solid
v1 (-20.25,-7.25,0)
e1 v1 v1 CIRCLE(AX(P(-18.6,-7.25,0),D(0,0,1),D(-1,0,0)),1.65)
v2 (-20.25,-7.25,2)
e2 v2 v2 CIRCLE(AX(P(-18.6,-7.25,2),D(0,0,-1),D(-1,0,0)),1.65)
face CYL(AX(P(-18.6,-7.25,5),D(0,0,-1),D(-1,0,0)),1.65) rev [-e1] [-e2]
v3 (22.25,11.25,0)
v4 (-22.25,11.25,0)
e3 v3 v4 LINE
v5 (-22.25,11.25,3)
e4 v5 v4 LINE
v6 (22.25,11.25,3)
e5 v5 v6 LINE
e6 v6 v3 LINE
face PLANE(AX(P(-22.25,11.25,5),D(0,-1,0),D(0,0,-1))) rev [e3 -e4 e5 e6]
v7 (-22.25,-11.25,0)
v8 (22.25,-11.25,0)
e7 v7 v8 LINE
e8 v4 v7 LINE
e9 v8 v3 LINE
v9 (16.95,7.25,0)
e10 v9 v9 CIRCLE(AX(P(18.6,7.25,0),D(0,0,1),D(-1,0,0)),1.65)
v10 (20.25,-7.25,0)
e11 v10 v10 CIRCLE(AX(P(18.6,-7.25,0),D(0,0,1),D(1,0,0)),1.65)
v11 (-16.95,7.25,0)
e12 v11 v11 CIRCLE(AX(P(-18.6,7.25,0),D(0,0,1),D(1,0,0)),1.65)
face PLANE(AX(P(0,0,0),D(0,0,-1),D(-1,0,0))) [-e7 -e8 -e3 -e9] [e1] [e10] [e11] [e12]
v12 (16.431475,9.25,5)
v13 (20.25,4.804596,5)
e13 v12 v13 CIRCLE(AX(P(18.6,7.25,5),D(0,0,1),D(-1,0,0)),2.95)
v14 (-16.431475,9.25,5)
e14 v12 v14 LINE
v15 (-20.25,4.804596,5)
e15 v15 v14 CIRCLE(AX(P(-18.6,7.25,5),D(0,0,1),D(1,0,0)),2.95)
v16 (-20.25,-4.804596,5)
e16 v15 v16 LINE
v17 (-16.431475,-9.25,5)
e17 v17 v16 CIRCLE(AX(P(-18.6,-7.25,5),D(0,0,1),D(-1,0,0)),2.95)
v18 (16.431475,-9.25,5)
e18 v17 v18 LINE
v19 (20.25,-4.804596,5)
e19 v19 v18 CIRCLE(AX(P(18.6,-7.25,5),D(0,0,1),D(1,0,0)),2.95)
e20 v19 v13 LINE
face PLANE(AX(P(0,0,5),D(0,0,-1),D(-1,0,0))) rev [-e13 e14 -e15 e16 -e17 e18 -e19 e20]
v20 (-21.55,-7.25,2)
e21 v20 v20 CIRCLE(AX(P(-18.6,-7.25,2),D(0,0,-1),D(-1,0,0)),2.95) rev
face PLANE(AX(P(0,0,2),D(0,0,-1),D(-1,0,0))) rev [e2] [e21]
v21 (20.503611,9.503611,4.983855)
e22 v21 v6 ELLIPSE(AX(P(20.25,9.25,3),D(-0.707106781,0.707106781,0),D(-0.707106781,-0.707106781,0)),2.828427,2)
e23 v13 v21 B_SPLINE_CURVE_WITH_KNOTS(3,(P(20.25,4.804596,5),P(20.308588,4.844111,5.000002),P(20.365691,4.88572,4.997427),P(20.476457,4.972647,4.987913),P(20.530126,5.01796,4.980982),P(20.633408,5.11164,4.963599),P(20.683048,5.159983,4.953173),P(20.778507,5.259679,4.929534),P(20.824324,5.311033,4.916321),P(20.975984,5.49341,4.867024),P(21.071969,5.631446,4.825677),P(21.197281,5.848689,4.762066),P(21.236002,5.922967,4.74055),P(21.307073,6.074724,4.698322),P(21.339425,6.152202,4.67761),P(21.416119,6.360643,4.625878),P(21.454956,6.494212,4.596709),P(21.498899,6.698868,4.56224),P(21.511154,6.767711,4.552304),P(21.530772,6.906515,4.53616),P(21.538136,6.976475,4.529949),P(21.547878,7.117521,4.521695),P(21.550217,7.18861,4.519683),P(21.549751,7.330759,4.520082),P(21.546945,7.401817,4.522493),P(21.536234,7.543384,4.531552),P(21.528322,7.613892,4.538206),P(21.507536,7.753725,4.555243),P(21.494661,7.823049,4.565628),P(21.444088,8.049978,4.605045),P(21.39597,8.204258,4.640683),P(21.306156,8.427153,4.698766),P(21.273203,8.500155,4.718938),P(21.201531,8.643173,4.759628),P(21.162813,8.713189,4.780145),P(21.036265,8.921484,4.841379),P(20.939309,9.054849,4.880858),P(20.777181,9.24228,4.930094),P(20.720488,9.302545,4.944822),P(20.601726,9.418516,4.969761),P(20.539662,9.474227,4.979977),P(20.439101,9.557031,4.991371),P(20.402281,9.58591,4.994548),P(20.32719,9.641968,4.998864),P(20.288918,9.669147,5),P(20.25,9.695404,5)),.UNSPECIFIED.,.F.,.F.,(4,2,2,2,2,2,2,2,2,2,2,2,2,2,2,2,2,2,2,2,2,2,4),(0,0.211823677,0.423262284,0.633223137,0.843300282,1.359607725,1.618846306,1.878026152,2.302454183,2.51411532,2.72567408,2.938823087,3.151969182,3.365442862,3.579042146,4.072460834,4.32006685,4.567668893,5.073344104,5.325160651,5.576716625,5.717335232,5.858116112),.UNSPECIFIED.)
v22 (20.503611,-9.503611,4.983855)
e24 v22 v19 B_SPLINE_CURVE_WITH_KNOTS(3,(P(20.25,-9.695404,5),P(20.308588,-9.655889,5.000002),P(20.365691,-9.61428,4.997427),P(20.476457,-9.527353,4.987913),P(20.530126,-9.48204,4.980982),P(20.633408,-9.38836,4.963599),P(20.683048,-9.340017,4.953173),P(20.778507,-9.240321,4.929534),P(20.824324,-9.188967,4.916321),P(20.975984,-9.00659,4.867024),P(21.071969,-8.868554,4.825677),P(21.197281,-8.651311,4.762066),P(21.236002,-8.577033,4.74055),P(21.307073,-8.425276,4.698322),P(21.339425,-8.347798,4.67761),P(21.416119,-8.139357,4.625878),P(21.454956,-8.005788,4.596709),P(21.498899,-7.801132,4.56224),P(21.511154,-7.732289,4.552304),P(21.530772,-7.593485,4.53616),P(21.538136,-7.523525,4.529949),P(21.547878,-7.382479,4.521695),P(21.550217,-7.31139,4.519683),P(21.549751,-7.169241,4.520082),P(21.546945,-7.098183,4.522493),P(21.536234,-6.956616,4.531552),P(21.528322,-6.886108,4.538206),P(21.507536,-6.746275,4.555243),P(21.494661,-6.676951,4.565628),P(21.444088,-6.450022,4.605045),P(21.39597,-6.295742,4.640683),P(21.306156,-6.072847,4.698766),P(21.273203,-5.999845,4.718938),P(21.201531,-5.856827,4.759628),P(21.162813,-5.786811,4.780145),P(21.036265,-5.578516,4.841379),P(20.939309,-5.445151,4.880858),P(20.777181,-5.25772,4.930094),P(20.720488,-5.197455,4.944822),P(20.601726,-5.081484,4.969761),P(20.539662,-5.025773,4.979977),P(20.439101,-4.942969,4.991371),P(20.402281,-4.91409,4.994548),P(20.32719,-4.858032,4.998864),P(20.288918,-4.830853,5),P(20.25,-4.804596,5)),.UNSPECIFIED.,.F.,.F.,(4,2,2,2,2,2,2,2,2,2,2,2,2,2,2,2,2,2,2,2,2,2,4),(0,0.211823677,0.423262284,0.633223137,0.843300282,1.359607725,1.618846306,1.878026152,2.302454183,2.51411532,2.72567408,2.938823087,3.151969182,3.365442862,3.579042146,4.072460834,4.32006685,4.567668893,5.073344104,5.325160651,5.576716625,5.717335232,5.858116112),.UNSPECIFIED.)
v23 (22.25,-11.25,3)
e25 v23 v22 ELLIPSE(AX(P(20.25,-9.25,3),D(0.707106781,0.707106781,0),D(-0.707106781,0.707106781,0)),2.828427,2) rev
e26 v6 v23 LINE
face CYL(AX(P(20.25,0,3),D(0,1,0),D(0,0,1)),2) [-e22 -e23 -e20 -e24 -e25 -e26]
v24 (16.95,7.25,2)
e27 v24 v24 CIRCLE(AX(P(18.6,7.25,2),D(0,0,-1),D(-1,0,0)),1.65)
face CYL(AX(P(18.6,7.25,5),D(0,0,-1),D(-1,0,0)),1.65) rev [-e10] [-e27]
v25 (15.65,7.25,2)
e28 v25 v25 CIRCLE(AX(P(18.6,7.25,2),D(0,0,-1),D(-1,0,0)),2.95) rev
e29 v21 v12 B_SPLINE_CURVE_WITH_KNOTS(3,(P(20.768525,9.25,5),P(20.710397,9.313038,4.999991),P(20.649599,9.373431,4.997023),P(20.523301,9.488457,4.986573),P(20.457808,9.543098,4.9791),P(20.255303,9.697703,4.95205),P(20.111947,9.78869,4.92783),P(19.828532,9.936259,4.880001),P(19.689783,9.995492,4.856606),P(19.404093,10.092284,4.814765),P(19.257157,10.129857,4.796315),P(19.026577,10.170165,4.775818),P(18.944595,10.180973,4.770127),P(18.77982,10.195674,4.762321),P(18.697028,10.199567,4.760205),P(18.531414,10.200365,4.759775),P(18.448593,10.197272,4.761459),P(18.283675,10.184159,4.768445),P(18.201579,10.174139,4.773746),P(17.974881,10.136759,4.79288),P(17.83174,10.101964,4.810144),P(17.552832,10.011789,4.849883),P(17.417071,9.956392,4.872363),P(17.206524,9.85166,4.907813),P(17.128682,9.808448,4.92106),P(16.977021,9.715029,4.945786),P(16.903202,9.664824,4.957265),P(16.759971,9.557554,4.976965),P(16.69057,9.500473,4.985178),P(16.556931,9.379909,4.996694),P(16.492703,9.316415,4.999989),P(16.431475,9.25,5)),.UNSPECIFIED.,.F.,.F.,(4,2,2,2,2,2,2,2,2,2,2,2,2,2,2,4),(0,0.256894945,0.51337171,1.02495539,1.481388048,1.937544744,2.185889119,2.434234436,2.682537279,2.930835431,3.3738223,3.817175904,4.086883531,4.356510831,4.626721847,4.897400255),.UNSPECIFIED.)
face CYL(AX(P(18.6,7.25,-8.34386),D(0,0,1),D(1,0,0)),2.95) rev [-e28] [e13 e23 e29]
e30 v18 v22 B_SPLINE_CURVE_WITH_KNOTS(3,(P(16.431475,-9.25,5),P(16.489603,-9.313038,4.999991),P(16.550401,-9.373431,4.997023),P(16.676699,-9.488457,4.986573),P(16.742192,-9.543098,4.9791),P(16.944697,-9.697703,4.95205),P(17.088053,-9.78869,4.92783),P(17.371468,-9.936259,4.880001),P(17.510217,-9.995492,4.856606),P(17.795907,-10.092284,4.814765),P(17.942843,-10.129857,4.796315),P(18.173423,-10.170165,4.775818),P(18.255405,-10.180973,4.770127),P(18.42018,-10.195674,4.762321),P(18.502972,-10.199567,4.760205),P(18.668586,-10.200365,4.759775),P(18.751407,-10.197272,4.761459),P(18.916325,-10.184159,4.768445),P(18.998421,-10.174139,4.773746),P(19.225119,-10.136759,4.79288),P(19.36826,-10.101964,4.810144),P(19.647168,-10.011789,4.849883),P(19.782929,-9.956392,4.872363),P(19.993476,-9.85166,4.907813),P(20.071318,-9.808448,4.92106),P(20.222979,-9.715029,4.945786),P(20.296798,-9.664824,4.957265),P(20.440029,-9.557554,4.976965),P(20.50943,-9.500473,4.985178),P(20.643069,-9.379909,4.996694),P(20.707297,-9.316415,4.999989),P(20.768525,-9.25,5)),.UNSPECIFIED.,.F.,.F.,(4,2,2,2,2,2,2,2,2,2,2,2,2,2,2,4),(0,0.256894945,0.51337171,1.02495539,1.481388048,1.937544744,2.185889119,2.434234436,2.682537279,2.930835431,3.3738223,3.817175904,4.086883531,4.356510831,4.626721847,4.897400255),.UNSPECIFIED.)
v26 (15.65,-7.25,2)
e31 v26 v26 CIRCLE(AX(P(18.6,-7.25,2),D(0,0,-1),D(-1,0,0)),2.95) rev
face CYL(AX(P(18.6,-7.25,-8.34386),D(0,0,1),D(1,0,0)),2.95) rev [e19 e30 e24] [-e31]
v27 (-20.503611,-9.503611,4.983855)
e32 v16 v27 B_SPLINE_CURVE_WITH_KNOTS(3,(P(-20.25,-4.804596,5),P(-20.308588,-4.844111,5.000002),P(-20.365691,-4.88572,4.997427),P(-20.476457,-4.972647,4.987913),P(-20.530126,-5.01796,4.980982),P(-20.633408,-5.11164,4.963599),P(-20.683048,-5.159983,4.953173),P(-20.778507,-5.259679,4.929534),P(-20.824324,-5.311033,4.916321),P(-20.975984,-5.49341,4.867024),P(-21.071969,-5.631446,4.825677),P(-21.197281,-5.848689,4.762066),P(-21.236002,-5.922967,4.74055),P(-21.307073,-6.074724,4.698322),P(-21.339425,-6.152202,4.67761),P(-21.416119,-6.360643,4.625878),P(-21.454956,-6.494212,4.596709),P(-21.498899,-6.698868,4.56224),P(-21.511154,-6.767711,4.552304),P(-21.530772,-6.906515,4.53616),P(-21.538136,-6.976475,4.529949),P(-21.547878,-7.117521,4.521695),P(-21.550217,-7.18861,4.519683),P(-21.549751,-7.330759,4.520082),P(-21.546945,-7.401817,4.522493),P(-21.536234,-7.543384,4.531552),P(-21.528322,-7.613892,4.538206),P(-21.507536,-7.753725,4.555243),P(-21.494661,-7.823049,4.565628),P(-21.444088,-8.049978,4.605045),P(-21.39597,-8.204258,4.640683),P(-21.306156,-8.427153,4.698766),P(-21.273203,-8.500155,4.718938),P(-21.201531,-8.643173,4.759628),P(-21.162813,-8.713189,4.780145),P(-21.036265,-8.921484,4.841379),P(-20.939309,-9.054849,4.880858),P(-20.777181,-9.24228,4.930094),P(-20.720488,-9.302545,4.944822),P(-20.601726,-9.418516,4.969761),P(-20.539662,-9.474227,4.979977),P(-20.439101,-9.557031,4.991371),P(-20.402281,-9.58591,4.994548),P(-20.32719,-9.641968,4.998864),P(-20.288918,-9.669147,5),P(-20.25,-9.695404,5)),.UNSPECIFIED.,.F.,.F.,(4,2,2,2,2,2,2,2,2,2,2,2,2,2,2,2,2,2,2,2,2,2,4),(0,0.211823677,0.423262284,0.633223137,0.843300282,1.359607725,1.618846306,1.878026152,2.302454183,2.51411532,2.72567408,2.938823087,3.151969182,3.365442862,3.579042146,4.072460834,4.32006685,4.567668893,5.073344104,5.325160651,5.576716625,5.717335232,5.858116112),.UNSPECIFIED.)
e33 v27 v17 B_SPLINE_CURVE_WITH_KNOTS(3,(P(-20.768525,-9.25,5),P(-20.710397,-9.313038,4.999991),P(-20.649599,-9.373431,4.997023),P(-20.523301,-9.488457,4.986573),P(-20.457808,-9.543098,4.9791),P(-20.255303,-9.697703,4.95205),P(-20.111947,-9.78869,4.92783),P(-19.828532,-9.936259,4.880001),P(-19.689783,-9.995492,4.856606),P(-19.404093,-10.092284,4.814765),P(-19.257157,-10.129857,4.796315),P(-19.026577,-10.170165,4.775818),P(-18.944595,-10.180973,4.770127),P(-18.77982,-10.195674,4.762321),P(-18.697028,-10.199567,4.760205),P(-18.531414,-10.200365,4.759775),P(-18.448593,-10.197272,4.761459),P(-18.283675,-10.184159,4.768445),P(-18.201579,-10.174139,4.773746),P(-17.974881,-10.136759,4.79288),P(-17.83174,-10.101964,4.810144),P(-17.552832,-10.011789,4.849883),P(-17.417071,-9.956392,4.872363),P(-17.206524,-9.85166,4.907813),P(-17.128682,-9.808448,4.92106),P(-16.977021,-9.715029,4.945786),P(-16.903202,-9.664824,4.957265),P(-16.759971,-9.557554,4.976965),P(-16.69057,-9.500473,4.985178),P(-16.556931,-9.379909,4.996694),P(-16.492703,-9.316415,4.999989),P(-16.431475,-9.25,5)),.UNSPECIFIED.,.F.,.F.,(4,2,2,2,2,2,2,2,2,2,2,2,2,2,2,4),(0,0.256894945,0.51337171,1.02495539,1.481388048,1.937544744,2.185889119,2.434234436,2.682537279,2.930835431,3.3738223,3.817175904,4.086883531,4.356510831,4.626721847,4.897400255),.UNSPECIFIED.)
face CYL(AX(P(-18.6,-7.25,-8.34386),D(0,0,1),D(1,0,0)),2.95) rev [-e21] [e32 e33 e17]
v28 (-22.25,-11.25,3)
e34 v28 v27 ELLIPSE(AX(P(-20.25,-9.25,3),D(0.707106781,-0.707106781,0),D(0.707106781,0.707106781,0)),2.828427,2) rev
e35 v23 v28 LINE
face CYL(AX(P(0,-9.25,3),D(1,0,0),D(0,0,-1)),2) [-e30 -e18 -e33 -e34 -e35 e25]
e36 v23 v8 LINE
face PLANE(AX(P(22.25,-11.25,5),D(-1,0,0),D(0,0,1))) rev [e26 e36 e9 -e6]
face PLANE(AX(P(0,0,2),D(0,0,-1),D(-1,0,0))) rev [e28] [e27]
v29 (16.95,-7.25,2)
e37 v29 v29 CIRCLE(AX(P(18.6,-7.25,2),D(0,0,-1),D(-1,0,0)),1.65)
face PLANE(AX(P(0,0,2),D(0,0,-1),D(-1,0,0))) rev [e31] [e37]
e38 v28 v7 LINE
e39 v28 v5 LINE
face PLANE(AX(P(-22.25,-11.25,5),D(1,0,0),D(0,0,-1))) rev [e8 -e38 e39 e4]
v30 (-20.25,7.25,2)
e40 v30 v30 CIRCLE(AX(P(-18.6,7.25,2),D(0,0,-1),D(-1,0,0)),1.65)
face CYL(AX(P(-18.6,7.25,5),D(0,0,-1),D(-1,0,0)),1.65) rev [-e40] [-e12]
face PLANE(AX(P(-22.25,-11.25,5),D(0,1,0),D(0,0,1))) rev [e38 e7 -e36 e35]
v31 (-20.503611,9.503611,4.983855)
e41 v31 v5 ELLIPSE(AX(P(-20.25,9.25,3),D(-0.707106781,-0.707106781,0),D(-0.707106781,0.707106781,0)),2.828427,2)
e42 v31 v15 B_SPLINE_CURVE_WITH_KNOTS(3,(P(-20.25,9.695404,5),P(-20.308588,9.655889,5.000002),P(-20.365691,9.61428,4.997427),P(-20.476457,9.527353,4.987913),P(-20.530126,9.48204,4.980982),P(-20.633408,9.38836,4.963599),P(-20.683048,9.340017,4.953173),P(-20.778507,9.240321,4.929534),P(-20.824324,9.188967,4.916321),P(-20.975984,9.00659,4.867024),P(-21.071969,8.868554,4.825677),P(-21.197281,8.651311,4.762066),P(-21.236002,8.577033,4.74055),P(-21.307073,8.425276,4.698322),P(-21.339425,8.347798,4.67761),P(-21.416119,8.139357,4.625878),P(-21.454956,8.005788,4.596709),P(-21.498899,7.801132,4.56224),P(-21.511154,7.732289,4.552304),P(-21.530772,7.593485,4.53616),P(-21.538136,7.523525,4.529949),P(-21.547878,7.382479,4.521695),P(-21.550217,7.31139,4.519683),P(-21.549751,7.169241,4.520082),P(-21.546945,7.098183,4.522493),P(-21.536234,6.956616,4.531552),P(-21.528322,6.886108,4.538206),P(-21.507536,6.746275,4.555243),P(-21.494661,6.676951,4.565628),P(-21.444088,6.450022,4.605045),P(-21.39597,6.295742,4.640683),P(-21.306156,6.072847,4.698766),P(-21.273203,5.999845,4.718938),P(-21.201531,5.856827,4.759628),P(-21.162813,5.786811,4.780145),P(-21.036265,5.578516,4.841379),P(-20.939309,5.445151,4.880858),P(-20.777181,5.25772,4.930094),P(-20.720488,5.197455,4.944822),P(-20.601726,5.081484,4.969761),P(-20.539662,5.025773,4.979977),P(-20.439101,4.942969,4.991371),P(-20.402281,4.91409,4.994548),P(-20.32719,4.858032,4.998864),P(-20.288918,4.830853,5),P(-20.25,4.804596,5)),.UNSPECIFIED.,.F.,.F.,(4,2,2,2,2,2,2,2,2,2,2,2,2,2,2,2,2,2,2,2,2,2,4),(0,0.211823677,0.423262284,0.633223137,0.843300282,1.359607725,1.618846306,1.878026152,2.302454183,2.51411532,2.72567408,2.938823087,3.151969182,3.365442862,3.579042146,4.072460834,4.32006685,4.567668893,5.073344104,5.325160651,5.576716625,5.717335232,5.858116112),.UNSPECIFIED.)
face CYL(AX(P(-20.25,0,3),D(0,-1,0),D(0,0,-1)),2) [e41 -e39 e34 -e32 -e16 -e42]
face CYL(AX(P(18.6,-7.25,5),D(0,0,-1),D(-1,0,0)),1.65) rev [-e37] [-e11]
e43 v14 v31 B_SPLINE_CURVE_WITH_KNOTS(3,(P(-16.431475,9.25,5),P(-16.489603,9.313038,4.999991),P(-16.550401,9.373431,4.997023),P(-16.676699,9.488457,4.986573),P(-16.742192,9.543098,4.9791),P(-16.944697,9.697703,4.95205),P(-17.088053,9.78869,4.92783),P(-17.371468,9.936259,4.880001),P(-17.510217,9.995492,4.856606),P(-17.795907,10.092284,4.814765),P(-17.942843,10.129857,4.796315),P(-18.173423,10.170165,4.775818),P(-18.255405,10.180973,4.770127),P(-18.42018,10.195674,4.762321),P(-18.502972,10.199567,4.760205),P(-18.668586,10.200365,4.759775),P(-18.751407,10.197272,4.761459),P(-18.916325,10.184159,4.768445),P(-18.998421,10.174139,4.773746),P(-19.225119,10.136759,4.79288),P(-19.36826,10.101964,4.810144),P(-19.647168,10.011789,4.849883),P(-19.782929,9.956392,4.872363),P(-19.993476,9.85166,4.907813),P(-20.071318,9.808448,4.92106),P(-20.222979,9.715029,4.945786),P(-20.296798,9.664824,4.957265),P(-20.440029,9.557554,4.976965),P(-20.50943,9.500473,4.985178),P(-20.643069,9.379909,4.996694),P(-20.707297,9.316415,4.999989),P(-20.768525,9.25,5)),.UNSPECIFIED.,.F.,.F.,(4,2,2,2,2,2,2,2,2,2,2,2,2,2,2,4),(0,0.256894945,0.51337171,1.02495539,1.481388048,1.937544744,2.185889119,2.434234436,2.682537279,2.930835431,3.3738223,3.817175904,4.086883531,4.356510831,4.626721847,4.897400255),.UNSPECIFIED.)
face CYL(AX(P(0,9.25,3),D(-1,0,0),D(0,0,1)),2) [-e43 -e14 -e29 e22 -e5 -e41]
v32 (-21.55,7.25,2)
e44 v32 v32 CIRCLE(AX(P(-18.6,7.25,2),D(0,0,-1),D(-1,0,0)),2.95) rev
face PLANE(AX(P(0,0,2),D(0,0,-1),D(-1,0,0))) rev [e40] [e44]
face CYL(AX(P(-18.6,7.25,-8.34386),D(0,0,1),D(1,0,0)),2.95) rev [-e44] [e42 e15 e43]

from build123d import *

# Parameters (mm, degrees)
SKIZZE1_W                       = 44.5
SKIZZE1_H                       = 22.5
SKIZZE1_R                       = 1.65
AUFSATZ_LINEAR_AUSTRAGEN1_DEPTH = 5
VERRUNDUNG1_R                   = 2
SKIZZE2_R                       = 2.95
SCHNITT_LINEAR_AUSTRAGEN1_DEPTH = 3


with BuildPart() as part:
    # Skizze1 → Aufsatz-Linear austragen1 (new body)
    with BuildSketch(Plane.XY):
        Rectangle(SKIZZE1_W, SKIZZE1_H)
        with Locations((-18.6, 7.25)):
            Circle(SKIZZE1_R, mode=Mode.SUBTRACT)
        with Locations(Location((18.6, 7.25, 0), (0, 0, 180))):
            Circle(SKIZZE1_R, mode=Mode.SUBTRACT)
        with Locations((18.6, -7.25)):
            Circle(SKIZZE1_R, mode=Mode.SUBTRACT)
        with Locations(Location((-18.6, -7.25, 0), (0, 0, 180))):
            Circle(SKIZZE1_R, mode=Mode.SUBTRACT)
    extrude(amount=AUFSATZ_LINEAR_AUSTRAGEN1_DEPTH)

    # Verrundung1
    verrundung1_edges = [part.edges().sort_by_distance(p)[0] for p in [
        (-22.25, 0, 5),
        (0, -11.25, 5),
        (22.25, 0, 5),
        (0, 11.25, 5),
    ]]
    fillet(verrundung1_edges, radius=VERRUNDUNG1_R - 0.0001)  # a hair under: the kernel refuses the full size

    # Skizze2 → Schnitt-Linear austragen1 (cut)
    with BuildSketch(Plane.XY.offset(5)):
        with Locations(Location((-18.6, 7.25, 0), (0, 0, 42.684910775))):
            Circle(SKIZZE2_R)
        with Locations(Location((-18.6, -7.25, 0), (0, 0, 317.315089225))):
            Circle(SKIZZE2_R)
        with Locations(Location((18.6, -7.25, 0), (0, 0, 310.187569286))):
            Circle(SKIZZE2_R)
        with Locations(Location((18.6, 7.25, 0), (0, 0, 49.812430991))):
            Circle(SKIZZE2_R)
    extrude(amount=-SCHNITT_LINEAR_AUSTRAGEN1_DEPTH, mode=Mode.SUBTRACT)


solid = part.part
